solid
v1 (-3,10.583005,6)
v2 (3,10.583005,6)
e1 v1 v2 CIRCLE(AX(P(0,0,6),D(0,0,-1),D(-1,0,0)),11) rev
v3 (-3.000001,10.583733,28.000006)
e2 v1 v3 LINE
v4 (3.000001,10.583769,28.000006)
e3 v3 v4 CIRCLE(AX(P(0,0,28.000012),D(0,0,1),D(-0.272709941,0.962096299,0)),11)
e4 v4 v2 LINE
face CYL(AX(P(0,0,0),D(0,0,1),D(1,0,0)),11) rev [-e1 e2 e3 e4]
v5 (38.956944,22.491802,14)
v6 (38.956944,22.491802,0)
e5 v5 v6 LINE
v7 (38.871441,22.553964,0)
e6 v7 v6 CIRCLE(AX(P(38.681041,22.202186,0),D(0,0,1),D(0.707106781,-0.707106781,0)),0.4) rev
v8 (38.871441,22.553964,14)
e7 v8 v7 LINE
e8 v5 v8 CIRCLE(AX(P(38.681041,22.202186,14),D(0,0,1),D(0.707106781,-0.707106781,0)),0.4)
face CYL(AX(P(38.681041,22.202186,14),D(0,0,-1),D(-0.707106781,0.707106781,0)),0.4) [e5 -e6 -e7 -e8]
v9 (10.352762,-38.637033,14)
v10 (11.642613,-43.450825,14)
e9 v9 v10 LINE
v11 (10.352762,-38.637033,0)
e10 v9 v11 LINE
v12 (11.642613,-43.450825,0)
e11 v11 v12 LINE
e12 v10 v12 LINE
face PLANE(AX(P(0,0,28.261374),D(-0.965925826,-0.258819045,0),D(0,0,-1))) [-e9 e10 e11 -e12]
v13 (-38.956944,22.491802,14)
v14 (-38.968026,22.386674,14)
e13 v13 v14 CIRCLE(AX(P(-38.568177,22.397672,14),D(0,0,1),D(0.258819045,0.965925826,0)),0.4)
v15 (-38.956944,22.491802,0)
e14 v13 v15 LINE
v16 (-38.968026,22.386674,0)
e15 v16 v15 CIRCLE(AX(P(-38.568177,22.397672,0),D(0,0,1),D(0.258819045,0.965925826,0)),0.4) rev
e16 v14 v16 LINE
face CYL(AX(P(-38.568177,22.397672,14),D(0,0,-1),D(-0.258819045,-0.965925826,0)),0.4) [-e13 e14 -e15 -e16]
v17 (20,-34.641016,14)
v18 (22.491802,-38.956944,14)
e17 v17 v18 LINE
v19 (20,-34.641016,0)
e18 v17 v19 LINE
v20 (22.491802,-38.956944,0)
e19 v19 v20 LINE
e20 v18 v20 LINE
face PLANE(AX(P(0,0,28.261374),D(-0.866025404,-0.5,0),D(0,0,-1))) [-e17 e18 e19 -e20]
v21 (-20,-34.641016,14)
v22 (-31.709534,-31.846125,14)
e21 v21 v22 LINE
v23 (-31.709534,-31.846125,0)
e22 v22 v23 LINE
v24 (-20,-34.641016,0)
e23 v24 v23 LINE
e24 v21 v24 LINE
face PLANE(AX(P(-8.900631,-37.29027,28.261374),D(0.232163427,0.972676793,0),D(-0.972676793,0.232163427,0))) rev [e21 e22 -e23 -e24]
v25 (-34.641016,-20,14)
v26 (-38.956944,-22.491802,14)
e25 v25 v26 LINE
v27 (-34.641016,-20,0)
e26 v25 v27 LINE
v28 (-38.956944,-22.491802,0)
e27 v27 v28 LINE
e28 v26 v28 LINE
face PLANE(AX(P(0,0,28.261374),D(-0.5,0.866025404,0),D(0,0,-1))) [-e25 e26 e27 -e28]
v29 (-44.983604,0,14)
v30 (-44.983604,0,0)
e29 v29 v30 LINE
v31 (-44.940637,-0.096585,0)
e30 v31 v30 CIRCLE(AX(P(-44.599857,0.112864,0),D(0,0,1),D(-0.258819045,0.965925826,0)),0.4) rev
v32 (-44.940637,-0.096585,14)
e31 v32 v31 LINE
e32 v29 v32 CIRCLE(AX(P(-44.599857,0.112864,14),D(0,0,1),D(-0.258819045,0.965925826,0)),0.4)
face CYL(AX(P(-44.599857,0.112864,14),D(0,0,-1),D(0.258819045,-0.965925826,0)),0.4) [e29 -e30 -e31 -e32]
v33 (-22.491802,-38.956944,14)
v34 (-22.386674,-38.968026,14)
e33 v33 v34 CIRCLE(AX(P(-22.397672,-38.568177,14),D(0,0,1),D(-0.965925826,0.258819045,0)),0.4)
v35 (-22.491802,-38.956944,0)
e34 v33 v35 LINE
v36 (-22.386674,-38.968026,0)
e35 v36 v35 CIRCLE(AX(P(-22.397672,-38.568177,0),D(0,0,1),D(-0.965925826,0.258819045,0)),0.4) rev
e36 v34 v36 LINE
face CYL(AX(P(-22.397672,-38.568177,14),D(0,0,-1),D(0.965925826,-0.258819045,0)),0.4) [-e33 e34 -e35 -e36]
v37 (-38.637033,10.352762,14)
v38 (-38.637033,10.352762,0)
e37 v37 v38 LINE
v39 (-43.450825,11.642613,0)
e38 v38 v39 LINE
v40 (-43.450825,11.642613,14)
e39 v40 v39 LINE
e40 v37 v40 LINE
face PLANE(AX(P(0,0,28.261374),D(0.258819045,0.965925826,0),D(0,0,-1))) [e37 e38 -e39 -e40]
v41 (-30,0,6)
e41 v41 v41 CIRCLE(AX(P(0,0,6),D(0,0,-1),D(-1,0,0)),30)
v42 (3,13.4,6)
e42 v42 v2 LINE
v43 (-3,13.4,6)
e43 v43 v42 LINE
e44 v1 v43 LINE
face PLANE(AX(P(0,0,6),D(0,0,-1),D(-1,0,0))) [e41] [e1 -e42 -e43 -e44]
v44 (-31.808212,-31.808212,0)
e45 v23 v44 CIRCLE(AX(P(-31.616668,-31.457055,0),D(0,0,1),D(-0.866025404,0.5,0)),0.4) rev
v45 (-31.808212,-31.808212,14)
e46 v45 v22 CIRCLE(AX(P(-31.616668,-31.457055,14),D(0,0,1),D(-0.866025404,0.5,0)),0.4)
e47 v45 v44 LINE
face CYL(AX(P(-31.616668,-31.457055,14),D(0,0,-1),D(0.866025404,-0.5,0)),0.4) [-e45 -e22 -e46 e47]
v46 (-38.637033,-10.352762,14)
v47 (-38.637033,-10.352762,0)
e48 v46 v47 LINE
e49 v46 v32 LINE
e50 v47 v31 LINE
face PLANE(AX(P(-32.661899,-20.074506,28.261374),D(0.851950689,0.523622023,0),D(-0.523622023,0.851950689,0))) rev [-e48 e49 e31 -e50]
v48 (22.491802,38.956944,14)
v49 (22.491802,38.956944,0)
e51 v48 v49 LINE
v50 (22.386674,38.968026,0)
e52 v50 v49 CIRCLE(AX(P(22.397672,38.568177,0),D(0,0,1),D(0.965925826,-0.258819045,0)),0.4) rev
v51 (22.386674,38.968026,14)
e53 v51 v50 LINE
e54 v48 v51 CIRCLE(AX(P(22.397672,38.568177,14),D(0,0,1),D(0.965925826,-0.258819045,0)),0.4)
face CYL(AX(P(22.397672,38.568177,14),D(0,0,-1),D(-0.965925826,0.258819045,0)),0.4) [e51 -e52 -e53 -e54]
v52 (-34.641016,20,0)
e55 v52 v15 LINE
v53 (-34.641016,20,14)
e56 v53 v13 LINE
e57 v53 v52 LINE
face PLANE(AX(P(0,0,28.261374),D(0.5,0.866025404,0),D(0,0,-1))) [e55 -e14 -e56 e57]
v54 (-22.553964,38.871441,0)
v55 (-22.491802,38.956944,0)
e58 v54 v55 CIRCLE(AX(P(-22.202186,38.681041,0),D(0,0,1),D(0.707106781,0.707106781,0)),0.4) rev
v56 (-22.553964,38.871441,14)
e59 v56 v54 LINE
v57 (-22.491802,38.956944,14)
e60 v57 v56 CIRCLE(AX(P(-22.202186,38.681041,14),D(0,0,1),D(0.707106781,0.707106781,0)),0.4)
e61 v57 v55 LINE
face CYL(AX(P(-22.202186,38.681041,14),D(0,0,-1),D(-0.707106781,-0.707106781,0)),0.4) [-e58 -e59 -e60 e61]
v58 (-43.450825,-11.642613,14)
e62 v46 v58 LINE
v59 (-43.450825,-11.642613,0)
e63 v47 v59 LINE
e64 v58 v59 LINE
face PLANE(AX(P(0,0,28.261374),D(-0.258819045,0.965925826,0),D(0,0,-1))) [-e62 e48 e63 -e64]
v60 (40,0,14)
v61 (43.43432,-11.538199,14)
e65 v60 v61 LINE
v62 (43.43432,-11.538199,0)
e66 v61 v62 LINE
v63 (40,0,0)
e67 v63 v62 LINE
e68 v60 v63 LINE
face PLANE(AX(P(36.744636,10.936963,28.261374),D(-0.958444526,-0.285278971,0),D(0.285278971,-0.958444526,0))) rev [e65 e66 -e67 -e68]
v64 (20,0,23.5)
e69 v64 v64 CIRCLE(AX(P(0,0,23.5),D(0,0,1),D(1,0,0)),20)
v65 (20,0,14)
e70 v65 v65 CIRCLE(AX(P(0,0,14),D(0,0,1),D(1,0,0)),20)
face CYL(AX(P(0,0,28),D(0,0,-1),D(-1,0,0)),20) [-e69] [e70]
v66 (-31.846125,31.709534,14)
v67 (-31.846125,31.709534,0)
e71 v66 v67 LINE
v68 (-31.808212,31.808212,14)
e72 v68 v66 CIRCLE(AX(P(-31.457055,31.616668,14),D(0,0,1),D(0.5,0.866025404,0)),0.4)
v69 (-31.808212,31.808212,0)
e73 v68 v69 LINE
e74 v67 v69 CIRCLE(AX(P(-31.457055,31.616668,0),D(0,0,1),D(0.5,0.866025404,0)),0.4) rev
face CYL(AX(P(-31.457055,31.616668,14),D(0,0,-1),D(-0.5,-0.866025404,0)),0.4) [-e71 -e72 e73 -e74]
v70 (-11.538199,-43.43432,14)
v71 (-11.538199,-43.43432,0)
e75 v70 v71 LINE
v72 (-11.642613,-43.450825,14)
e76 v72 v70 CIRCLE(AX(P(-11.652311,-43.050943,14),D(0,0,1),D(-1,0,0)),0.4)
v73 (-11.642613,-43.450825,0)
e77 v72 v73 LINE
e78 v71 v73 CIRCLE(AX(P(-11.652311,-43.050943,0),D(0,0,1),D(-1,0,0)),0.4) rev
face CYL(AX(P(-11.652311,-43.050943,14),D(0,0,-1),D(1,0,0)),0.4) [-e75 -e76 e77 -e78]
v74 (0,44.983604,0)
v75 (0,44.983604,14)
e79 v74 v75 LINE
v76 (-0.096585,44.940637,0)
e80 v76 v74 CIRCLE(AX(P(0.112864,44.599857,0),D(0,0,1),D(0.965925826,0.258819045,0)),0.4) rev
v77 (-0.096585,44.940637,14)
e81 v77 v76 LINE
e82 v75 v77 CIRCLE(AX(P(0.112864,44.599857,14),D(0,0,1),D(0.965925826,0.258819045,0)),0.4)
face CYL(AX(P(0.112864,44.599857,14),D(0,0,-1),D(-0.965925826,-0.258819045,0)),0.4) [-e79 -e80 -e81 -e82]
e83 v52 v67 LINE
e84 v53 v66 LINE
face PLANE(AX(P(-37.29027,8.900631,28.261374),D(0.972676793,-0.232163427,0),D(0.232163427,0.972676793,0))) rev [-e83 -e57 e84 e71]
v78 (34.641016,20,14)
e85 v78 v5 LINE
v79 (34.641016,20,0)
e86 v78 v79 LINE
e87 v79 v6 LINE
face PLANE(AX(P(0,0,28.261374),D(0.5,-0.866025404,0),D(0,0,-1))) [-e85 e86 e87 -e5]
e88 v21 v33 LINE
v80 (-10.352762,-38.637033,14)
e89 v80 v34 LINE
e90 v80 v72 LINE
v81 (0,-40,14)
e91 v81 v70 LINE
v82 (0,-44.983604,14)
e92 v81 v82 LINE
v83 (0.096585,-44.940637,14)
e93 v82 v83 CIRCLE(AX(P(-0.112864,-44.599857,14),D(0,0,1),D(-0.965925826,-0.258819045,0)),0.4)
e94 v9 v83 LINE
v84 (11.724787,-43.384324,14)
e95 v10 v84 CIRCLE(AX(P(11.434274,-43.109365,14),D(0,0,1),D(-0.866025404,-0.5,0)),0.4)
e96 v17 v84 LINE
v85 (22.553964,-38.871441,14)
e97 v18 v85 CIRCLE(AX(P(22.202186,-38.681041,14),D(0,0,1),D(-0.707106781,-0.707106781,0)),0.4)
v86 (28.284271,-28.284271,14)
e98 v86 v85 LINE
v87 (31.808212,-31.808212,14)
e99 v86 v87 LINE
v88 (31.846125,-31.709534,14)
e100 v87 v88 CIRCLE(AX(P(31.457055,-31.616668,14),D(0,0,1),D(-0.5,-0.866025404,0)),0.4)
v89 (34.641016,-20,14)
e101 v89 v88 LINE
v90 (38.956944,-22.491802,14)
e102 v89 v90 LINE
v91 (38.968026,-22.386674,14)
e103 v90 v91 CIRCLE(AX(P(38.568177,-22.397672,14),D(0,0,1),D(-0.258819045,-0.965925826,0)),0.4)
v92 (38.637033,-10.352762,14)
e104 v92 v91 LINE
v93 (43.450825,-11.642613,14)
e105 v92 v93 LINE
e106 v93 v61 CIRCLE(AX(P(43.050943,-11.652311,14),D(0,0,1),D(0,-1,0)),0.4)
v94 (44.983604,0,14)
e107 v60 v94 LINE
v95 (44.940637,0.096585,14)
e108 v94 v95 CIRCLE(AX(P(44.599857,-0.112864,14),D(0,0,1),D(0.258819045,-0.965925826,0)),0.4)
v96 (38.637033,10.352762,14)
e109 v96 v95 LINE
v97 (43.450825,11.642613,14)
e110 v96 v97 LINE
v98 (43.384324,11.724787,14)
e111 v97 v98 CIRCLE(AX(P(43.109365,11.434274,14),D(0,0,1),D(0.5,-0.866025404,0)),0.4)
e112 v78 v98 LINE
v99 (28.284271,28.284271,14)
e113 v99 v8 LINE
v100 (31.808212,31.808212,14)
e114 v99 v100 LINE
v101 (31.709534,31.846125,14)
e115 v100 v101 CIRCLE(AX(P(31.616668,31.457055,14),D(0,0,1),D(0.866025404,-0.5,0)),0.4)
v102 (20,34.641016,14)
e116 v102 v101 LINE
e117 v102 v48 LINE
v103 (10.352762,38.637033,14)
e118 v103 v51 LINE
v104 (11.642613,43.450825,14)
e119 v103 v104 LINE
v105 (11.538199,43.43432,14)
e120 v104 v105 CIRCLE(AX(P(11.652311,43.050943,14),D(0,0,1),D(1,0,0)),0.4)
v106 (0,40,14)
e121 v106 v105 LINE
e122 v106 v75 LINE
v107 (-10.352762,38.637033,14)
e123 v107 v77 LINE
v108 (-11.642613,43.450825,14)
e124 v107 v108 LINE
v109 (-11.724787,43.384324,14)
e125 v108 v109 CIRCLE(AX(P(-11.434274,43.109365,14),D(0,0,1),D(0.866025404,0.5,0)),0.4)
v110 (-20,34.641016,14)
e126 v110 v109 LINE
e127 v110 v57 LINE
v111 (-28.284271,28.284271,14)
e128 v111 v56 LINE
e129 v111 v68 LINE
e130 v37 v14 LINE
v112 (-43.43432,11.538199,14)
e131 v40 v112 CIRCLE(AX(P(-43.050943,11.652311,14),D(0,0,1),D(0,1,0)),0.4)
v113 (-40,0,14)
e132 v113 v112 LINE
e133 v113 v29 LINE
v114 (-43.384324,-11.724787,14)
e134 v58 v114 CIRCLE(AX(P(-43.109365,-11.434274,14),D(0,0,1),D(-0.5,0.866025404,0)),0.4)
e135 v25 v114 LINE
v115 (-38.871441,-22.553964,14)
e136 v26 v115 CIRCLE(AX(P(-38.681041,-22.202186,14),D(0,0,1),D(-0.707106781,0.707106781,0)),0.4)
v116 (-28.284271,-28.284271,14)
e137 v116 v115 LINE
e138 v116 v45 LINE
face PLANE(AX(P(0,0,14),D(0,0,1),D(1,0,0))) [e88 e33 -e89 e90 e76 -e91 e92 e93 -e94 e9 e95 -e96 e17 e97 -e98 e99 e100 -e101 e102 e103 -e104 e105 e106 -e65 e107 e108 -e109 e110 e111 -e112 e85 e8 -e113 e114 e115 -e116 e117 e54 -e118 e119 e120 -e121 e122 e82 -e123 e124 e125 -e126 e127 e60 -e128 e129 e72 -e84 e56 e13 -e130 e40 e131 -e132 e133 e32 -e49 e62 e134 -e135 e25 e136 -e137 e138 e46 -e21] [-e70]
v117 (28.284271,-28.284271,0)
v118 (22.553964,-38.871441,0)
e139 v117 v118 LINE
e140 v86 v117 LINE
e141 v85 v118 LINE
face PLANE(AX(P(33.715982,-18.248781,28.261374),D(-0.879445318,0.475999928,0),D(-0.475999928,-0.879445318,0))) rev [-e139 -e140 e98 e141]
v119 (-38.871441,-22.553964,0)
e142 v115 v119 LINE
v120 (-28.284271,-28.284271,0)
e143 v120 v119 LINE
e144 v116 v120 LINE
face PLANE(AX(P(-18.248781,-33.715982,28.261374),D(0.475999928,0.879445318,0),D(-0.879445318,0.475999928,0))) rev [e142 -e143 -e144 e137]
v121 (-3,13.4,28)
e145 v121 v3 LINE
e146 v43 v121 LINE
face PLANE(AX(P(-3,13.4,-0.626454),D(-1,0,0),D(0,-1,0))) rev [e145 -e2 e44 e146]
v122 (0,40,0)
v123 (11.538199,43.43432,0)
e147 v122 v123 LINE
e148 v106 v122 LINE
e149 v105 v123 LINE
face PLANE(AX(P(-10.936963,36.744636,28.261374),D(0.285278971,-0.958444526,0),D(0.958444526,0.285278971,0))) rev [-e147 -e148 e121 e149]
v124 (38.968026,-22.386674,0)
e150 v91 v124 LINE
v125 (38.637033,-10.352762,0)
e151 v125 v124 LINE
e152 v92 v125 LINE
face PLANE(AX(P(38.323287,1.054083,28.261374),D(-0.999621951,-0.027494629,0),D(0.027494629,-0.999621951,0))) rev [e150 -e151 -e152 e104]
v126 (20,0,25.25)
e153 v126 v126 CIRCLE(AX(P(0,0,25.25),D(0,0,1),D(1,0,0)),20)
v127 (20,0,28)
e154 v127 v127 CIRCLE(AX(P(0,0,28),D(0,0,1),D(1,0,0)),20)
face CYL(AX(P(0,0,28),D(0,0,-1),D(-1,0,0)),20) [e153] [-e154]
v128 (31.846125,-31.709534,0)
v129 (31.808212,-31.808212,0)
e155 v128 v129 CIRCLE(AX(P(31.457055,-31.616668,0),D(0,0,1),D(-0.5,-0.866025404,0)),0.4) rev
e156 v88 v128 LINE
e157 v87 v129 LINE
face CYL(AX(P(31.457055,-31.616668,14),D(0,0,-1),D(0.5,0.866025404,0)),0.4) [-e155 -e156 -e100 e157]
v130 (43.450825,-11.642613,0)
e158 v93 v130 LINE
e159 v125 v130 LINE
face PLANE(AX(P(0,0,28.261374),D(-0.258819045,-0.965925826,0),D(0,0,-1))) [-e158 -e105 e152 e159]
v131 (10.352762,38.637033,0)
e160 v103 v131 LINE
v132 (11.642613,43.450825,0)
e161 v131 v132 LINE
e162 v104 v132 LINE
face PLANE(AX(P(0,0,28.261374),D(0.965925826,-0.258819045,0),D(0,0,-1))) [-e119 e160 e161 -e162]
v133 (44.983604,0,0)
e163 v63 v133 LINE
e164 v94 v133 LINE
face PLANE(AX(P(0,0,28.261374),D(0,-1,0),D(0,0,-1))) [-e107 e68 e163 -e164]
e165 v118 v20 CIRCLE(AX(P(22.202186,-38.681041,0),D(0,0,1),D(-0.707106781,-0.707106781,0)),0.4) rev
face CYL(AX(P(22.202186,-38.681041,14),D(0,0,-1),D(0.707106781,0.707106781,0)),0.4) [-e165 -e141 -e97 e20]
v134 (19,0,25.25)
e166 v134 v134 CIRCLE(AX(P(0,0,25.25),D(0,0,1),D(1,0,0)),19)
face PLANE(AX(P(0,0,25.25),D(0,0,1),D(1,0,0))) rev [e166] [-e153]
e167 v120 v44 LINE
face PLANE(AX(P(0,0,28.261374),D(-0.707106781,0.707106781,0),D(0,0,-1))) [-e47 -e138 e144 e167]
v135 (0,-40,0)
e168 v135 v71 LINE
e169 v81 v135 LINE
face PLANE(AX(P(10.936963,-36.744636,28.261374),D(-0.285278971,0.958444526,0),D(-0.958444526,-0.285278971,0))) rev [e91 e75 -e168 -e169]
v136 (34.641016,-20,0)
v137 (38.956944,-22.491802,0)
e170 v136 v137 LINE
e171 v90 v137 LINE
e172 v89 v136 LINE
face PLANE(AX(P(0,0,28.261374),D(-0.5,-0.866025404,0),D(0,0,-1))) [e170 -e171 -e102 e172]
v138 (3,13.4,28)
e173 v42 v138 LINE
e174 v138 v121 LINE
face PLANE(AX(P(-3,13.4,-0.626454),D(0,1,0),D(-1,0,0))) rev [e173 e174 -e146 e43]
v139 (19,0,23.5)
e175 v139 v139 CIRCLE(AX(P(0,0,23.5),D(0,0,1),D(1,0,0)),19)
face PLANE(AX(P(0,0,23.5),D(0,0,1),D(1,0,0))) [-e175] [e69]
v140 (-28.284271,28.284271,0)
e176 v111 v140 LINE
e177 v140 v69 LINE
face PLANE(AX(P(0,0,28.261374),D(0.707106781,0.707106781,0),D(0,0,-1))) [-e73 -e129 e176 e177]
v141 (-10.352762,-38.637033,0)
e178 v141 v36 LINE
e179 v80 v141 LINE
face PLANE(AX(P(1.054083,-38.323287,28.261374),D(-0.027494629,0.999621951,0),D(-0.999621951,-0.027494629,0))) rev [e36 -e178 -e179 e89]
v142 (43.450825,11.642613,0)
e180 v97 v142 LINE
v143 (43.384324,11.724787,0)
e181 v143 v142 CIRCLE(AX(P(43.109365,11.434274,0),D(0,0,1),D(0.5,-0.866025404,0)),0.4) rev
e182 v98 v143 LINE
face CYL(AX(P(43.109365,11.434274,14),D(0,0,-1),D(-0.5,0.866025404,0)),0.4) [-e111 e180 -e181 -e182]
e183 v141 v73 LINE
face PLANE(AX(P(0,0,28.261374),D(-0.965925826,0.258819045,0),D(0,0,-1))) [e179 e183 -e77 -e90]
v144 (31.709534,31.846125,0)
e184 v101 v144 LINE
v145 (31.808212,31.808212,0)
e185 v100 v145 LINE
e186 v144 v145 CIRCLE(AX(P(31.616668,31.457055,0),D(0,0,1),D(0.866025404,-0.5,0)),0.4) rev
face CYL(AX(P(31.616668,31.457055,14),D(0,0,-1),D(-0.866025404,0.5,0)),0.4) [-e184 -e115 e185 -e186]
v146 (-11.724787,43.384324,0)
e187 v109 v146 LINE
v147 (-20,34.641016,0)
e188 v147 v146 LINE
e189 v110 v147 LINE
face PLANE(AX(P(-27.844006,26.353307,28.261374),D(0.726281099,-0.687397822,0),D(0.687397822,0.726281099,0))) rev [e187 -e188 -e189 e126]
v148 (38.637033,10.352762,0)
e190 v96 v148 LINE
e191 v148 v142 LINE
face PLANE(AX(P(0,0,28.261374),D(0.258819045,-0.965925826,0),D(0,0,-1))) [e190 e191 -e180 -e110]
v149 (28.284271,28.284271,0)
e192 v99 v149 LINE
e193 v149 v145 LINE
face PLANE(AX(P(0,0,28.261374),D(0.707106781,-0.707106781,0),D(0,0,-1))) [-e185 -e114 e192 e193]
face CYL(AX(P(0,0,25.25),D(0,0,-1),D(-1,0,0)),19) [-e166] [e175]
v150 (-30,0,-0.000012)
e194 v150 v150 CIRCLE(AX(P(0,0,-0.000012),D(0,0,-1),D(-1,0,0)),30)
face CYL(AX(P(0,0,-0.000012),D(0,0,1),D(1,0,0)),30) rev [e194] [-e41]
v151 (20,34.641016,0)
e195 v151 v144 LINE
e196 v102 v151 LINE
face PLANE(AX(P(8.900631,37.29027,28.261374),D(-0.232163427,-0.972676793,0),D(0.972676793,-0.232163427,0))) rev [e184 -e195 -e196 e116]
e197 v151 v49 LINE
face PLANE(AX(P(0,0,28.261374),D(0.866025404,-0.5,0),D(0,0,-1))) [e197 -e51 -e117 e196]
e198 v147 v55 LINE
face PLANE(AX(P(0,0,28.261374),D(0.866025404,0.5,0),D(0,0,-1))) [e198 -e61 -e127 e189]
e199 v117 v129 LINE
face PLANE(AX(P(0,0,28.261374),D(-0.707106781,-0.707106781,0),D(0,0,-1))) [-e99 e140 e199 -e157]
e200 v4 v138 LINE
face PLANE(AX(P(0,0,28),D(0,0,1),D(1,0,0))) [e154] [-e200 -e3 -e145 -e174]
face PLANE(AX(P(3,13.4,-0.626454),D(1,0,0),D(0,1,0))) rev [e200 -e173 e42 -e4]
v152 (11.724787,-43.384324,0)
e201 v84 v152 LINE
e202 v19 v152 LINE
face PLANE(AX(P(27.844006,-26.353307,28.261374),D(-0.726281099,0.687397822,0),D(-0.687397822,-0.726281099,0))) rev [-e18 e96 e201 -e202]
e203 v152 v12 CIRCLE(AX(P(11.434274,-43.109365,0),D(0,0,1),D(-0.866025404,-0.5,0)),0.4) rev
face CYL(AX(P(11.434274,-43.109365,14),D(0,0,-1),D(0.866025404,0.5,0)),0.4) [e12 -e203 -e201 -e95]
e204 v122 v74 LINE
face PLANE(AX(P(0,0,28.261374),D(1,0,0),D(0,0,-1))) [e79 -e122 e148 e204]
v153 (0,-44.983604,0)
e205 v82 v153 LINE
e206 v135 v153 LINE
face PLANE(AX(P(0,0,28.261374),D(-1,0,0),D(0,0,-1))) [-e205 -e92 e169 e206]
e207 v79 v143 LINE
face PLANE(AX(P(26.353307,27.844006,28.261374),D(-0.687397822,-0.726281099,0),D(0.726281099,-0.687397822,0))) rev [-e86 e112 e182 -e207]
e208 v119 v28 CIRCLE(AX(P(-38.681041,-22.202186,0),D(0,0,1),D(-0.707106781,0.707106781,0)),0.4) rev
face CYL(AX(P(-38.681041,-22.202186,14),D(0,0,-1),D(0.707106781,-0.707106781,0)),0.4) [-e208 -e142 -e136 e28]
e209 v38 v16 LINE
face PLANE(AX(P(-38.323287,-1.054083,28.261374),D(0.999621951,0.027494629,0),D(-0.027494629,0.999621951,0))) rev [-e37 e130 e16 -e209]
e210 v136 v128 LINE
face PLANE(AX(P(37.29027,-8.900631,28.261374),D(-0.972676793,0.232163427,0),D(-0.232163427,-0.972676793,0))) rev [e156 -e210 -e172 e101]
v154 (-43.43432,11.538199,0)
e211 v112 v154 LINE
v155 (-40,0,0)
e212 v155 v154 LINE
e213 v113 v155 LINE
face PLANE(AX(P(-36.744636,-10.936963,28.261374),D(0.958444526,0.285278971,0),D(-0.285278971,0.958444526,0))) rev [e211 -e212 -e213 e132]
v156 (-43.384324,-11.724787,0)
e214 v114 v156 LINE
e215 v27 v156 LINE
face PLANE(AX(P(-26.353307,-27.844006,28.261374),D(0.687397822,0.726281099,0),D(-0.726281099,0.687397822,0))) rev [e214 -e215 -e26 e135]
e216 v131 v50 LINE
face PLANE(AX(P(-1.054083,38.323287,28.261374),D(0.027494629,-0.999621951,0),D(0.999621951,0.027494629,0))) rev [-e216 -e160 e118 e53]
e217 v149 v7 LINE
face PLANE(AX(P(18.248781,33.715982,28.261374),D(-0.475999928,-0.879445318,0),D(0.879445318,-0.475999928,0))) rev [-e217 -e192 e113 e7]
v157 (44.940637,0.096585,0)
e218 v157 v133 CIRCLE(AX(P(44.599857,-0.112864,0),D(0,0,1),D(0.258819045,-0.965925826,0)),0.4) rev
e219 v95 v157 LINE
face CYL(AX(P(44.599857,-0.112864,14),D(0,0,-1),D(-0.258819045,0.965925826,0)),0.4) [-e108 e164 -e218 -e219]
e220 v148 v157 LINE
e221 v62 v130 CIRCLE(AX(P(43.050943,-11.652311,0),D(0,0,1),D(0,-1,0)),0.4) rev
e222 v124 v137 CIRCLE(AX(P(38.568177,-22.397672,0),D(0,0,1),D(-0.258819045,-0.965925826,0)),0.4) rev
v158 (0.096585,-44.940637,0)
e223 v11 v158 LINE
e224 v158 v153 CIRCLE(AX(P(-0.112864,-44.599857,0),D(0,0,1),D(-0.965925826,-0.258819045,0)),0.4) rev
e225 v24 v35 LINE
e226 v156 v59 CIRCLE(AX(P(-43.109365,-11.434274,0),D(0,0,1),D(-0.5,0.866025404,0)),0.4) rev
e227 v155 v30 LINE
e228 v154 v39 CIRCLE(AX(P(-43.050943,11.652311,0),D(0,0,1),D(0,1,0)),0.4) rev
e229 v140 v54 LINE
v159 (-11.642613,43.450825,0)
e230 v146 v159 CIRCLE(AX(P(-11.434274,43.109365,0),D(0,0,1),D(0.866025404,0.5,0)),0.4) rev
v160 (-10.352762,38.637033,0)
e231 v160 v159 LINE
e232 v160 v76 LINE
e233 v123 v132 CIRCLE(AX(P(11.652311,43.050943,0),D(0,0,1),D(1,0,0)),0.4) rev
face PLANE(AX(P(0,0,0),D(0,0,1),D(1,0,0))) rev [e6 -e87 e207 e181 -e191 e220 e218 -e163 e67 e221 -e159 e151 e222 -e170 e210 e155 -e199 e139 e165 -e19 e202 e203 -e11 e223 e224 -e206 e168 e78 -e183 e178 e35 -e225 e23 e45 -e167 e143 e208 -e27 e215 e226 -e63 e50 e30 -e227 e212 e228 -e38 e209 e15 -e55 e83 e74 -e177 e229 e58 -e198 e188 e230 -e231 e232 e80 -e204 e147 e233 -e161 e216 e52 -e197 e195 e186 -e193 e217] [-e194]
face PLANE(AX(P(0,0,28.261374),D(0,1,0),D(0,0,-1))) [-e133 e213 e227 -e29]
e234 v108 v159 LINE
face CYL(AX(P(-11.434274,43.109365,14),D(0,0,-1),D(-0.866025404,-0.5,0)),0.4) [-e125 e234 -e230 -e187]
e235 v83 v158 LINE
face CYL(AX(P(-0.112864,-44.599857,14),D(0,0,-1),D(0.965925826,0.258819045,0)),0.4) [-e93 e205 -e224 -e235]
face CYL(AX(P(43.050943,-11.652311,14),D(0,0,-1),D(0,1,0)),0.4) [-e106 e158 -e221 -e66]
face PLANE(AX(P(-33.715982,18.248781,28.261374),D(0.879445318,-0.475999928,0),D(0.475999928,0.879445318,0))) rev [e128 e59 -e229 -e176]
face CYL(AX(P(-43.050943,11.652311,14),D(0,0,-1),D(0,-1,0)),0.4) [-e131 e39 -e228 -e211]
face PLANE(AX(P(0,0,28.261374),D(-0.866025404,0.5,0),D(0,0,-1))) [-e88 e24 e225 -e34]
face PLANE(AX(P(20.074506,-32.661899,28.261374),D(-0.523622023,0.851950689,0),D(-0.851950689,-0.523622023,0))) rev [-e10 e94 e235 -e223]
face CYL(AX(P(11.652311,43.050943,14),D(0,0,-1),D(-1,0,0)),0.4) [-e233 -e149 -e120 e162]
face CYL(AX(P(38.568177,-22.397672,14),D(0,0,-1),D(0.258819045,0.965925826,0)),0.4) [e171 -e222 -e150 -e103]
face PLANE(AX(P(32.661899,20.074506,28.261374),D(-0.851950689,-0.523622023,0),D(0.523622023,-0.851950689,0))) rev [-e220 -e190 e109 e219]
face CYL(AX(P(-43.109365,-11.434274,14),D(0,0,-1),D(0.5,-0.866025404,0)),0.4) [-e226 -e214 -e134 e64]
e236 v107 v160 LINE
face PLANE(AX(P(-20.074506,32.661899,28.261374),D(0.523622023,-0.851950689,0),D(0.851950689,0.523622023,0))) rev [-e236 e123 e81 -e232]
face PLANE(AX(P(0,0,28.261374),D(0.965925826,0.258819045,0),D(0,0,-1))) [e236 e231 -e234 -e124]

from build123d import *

# Parameters (mm, degrees)
SKETCH1_R                  = 45
BOSS_EXTRUDE1_DEPTH        = 14
SKETCH2_R                  = 20
BOSS_EXTRUDE2_DEPTH        = 14
CUT_EXTRUDE1_DEPTH         = 70.526973183
CUT_EXTRUDE1_DEPTH_BACK    = 70.526973183
SKETCH3_R                  = 11
CUT_EXTRUDE2_DEPTH         = 70.526973183
CUT_EXTRUDE2_DEPTH_BACK    = 6
SKETCH4_R                  = 30
CUT_EXTRUDE3_DEPTH         = 70.526973183
CUT_EXTRUDE3_DEPTH_BACK    = 70.526973183
SKETCH5_W                  = 6
SKETCH5_H                  = 4.8
CUT_EXTRUDE4_DEPTH         = 70.526973183
FILLET1_R                  = 0.4
CIRPATTERN1_DEPTH          = 14
CUT_J8_CIRCLIPGROOVE_START = 23.5
SKETCH_J8_GROOVE_R         = 21.5
SKETCH_J8_GROOVE_R_2       = 19
CUT_J8_CIRCLIPGROOVE_DEPTH = 1.75


# Read off the part's stored shape, not the designer's step: CirPattern1
with BuildPart() as part:
    # Sketch1 → Boss-Extrude1 (new body)
    with BuildSketch(Plane.XY):
        Circle(SKETCH1_R)
    extrude(amount=BOSS_EXTRUDE1_DEPTH)

    # Sketch2 → Boss-Extrude2 (add)
    with BuildSketch(Plane.XY.offset(14)):
        Circle(SKETCH2_R)
    extrude(amount=BOSS_EXTRUDE2_DEPTH)

    # Sketch3 → Cut-Extrude1 (cut, two sides: drawn at the far end of the back side and taken through both)
    with BuildSketch(Plane.XY.offset(28).offset(-CUT_EXTRUDE1_DEPTH_BACK)):
        Circle(SKETCH3_R)
    extrude(amount=CUT_EXTRUDE1_DEPTH + CUT_EXTRUDE1_DEPTH_BACK, mode=Mode.SUBTRACT)

    # Sketch4 → Cut-Extrude2 (cut, two sides: drawn at the far end of the back side and taken through both)
    with BuildSketch(Plane(origin=(0, 0, 0), x_dir=(-1, 0, 0), z_dir=(0, 0, -1)).offset(-CUT_EXTRUDE2_DEPTH_BACK)):
        Circle(SKETCH4_R)
    extrude(amount=CUT_EXTRUDE2_DEPTH + CUT_EXTRUDE2_DEPTH_BACK, mode=Mode.SUBTRACT)

    # Sketch5 → Cut-Extrude3 (cut, two sides: drawn at the far end of the back side and taken through both)
    with BuildSketch(Plane.XY.offset(28).offset(-CUT_EXTRUDE3_DEPTH_BACK)):
        with Locations((0, 11)):
            Rectangle(SKETCH5_W, SKETCH5_H)
    extrude(amount=CUT_EXTRUDE3_DEPTH + CUT_EXTRUDE3_DEPTH_BACK, mode=Mode.SUBTRACT)

    # Sketch6 → Cut-Extrude4 (cut, symmetric)
    with BuildSketch(Plane(origin=(0, 0, 0), x_dir=(-1, 0, 0), z_dir=(0, 0, -1))):
        with BuildLine():
            Line((0, 40), (0, 45))
            ThreePointArc((0, 45), (-5.87367865, 44.615018762), (-11.64685703, 43.466662183))
            Line((-11.64685703, 43.466662183), (0, 40))
        make_face()
    extrude(amount=CUT_EXTRUDE4_DEPTH, both=True, mode=Mode.SUBTRACT)

    # Fillet1
    fillet1_edges = [part.edges().sort_by_distance(p)[0] for p in [
        (11.64685703, 43.466662183, 7),
    ]]
    fillet(fillet1_edges, radius=FILLET1_R)

    # CirPattern1 outline → CirPattern1 (cut)
    with BuildSketch(Plane.XY):
        with BuildLine():
            Line((10.352761804, 38.637033052), (22.386673811, 38.96802613))
            ThreePointArc((22.386673811, 38.96802613), (22.43960565, 38.965973203), (22.491802074, 38.956943945))
            Line((22.491802074, 38.956943945), (20, 34.641016151))
            Line((20, 34.641016151), (31.709533711, 31.8461253))
            ThreePointArc((31.709533711, 31.8461253), (31.760130605, 31.830442556), (31.808211535, 31.808211535))
            Line((31.808211535, 31.808211535), (28.284271247, 28.284271247))
            Line((28.284271247, 28.284271247), (38.871441292, 22.553963659))
            ThreePointArc((38.871441292, 22.553963659), (38.916255145, 22.525719852), (38.956943945, 22.491802074))
            Line((38.956943945, 22.491802074), (34.641016151, 20))
            Line((34.641016151, 20), (43.384324386, 11.724786666))
            ThreePointArc((43.384324386, 11.724786666), (43.42030121, 11.685906565), (43.450825005, 11.642613471))
            Line((43.450825005, 11.642613471), (38.637033052, 10.352761804))
            Line((38.637033052, 10.352761804), (44.94063747, 0.096584839))
            ThreePointArc((44.94063747, 0.096584839), (44.965325502, 0.049718058), (44.983604147, 0))
            Line((44.983604147, 0), (40, 0))
            Line((40, 0), (43.434320378, -11.538199086))
            ThreePointArc((43.434320378, -11.538199086), (43.44603717, -11.589858654), (43.450825005, -11.642613471))
            Line((43.450825005, -11.642613471), (38.637033052, -10.352761804))
            Line((38.637033052, -10.352761804), (38.96802613, -22.386673811))
            ThreePointArc((38.96802613, -22.386673811), (38.965973203, -22.43960565), (38.956943945, -22.491802074))
            Line((38.956943945, -22.491802074), (34.641016151, -20))
            Line((34.641016151, -20), (31.8461253, -31.709533711))
            ThreePointArc((31.8461253, -31.709533711), (31.830442556, -31.760130605), (31.808211535, -31.808211535))
            Line((31.808211535, -31.808211535), (28.284271247, -28.284271247))
            Line((28.284271247, -28.284271247), (22.553963659, -38.871441292))
            ThreePointArc((22.553963659, -38.871441292), (22.525719852, -38.916255145), (22.491802074, -38.956943945))
            Line((22.491802074, -38.956943945), (20, -34.641016151))
            Line((20, -34.641016151), (11.724786666, -43.384324386))
            ThreePointArc((11.724786666, -43.384324386), (11.685906565, -43.42030121), (11.642613471, -43.450825005))
            Line((11.642613471, -43.450825005), (10.352761804, -38.637033052))
            Line((10.352761804, -38.637033052), (0.096584839, -44.94063747))
            ThreePointArc((0.096584839, -44.94063747), (0.049718058, -44.965325502), (0, -44.983604147))
            Line((0, -44.983604147), (0, -40))
            Line((0, -40), (-11.538199086, -43.434320378))
            ThreePointArc((-11.538199086, -43.434320378), (-11.589858654, -43.44603717), (-11.642613471, -43.450825005))
            Line((-11.642613471, -43.450825005), (-10.352761804, -38.637033052))
            Line((-10.352761804, -38.637033052), (-22.386673811, -38.96802613))
            ThreePointArc((-22.386673811, -38.96802613), (-22.43960565, -38.965973203), (-22.491802074, -38.956943945))
            Line((-22.491802074, -38.956943945), (-20, -34.641016151))
            Line((-20, -34.641016151), (-31.709533711, -31.8461253))
            ThreePointArc((-31.709533711, -31.8461253), (-31.760130605, -31.830442556), (-31.808211535, -31.808211535))
            Line((-31.808211535, -31.808211535), (-28.284271247, -28.284271247))
            Line((-28.284271247, -28.284271247), (-38.871441292, -22.553963659))
            ThreePointArc((-38.871441292, -22.553963659), (-38.916255145, -22.525719852), (-38.956943945, -22.491802074))
            Line((-38.956943945, -22.491802074), (-34.641016151, -20))
            Line((-34.641016151, -20), (-43.384324386, -11.724786666))
            ThreePointArc((-43.384324386, -11.724786666), (-43.42030121, -11.685906565), (-43.450825005, -11.642613471))
            Line((-43.450825005, -11.642613471), (-38.637033052, -10.352761804))
            Line((-38.637033052, -10.352761804), (-44.94063747, -0.096584839))
            ThreePointArc((-44.94063747, -0.096584839), (-44.965325502, -0.049718058), (-44.983604147, 0))
            Line((-44.983604147, 0), (-40, 0))
            Line((-40, 0), (-43.434320378, 11.538199086))
            ThreePointArc((-43.434320378, 11.538199086), (-43.44603717, 11.589858654), (-43.450825005, 11.642613471))
            Line((-43.450825005, 11.642613471), (-38.637033052, 10.352761804))
            Line((-38.637033052, 10.352761804), (-38.96802613, 22.386673811))
            ThreePointArc((-38.96802613, 22.386673811), (-38.965973203, 22.43960565), (-38.956943945, 22.491802074))
            Line((-38.956943945, 22.491802074), (-34.641016151, 20))
            Line((-34.641016151, 20), (-31.8461253, 31.709533711))
            ThreePointArc((-31.8461253, 31.709533711), (-31.830442556, 31.760130605), (-31.808211535, 31.808211535))
            Line((-31.808211535, 31.808211535), (-28.284271247, 28.284271247))
            Line((-28.284271247, 28.284271247), (-22.553963659, 38.871441292))
            ThreePointArc((-22.553963659, 38.871441292), (-22.525719852, 38.916255145), (-22.491802074, 38.956943945))
            Line((-22.491802074, 38.956943945), (-20, 34.641016151))
            Line((-20, 34.641016151), (-11.724786666, 43.384324386))
            ThreePointArc((-11.724786666, 43.384324386), (-11.685906565, 43.42030121), (-11.642613471, 43.450825005))
            Line((-11.642613471, 43.450825005), (-10.352761804, 38.637033052))
            Line((-10.352761804, 38.637033052), (-0.096584839, 44.94063747))
            ThreePointArc((-0.096584839, 44.94063747), (-0.049718058, 44.965325502), (0, 44.983604147))
            Line((0, 44.983604147), (0, 45))
            ThreePointArc((0, 45), (-5.930124979, -44.607551129), (11.756815703, 43.437049676))
            ThreePointArc((11.756815703, 43.437049676), (11.700212353, 43.448063996), (11.642613471, 43.450825005))
            Line((11.642613471, 43.450825005), (10.352761804, 38.637033052))
        make_face()
    extrude(amount=CIRPATTERN1_DEPTH, mode=Mode.SUBTRACT)

    # Sketch_J8_Groove → Cut_J8_CirclipGroove (cut)
    with BuildSketch(Plane.XY.offset(CUT_J8_CIRCLIPGROOVE_START)):
        Circle(SKETCH_J8_GROOVE_R)
        Circle(SKETCH_J8_GROOVE_R_2, mode=Mode.SUBTRACT)
    extrude(amount=CUT_J8_CIRCLIPGROOVE_DEPTH, mode=Mode.SUBTRACT)


solid = part.part
